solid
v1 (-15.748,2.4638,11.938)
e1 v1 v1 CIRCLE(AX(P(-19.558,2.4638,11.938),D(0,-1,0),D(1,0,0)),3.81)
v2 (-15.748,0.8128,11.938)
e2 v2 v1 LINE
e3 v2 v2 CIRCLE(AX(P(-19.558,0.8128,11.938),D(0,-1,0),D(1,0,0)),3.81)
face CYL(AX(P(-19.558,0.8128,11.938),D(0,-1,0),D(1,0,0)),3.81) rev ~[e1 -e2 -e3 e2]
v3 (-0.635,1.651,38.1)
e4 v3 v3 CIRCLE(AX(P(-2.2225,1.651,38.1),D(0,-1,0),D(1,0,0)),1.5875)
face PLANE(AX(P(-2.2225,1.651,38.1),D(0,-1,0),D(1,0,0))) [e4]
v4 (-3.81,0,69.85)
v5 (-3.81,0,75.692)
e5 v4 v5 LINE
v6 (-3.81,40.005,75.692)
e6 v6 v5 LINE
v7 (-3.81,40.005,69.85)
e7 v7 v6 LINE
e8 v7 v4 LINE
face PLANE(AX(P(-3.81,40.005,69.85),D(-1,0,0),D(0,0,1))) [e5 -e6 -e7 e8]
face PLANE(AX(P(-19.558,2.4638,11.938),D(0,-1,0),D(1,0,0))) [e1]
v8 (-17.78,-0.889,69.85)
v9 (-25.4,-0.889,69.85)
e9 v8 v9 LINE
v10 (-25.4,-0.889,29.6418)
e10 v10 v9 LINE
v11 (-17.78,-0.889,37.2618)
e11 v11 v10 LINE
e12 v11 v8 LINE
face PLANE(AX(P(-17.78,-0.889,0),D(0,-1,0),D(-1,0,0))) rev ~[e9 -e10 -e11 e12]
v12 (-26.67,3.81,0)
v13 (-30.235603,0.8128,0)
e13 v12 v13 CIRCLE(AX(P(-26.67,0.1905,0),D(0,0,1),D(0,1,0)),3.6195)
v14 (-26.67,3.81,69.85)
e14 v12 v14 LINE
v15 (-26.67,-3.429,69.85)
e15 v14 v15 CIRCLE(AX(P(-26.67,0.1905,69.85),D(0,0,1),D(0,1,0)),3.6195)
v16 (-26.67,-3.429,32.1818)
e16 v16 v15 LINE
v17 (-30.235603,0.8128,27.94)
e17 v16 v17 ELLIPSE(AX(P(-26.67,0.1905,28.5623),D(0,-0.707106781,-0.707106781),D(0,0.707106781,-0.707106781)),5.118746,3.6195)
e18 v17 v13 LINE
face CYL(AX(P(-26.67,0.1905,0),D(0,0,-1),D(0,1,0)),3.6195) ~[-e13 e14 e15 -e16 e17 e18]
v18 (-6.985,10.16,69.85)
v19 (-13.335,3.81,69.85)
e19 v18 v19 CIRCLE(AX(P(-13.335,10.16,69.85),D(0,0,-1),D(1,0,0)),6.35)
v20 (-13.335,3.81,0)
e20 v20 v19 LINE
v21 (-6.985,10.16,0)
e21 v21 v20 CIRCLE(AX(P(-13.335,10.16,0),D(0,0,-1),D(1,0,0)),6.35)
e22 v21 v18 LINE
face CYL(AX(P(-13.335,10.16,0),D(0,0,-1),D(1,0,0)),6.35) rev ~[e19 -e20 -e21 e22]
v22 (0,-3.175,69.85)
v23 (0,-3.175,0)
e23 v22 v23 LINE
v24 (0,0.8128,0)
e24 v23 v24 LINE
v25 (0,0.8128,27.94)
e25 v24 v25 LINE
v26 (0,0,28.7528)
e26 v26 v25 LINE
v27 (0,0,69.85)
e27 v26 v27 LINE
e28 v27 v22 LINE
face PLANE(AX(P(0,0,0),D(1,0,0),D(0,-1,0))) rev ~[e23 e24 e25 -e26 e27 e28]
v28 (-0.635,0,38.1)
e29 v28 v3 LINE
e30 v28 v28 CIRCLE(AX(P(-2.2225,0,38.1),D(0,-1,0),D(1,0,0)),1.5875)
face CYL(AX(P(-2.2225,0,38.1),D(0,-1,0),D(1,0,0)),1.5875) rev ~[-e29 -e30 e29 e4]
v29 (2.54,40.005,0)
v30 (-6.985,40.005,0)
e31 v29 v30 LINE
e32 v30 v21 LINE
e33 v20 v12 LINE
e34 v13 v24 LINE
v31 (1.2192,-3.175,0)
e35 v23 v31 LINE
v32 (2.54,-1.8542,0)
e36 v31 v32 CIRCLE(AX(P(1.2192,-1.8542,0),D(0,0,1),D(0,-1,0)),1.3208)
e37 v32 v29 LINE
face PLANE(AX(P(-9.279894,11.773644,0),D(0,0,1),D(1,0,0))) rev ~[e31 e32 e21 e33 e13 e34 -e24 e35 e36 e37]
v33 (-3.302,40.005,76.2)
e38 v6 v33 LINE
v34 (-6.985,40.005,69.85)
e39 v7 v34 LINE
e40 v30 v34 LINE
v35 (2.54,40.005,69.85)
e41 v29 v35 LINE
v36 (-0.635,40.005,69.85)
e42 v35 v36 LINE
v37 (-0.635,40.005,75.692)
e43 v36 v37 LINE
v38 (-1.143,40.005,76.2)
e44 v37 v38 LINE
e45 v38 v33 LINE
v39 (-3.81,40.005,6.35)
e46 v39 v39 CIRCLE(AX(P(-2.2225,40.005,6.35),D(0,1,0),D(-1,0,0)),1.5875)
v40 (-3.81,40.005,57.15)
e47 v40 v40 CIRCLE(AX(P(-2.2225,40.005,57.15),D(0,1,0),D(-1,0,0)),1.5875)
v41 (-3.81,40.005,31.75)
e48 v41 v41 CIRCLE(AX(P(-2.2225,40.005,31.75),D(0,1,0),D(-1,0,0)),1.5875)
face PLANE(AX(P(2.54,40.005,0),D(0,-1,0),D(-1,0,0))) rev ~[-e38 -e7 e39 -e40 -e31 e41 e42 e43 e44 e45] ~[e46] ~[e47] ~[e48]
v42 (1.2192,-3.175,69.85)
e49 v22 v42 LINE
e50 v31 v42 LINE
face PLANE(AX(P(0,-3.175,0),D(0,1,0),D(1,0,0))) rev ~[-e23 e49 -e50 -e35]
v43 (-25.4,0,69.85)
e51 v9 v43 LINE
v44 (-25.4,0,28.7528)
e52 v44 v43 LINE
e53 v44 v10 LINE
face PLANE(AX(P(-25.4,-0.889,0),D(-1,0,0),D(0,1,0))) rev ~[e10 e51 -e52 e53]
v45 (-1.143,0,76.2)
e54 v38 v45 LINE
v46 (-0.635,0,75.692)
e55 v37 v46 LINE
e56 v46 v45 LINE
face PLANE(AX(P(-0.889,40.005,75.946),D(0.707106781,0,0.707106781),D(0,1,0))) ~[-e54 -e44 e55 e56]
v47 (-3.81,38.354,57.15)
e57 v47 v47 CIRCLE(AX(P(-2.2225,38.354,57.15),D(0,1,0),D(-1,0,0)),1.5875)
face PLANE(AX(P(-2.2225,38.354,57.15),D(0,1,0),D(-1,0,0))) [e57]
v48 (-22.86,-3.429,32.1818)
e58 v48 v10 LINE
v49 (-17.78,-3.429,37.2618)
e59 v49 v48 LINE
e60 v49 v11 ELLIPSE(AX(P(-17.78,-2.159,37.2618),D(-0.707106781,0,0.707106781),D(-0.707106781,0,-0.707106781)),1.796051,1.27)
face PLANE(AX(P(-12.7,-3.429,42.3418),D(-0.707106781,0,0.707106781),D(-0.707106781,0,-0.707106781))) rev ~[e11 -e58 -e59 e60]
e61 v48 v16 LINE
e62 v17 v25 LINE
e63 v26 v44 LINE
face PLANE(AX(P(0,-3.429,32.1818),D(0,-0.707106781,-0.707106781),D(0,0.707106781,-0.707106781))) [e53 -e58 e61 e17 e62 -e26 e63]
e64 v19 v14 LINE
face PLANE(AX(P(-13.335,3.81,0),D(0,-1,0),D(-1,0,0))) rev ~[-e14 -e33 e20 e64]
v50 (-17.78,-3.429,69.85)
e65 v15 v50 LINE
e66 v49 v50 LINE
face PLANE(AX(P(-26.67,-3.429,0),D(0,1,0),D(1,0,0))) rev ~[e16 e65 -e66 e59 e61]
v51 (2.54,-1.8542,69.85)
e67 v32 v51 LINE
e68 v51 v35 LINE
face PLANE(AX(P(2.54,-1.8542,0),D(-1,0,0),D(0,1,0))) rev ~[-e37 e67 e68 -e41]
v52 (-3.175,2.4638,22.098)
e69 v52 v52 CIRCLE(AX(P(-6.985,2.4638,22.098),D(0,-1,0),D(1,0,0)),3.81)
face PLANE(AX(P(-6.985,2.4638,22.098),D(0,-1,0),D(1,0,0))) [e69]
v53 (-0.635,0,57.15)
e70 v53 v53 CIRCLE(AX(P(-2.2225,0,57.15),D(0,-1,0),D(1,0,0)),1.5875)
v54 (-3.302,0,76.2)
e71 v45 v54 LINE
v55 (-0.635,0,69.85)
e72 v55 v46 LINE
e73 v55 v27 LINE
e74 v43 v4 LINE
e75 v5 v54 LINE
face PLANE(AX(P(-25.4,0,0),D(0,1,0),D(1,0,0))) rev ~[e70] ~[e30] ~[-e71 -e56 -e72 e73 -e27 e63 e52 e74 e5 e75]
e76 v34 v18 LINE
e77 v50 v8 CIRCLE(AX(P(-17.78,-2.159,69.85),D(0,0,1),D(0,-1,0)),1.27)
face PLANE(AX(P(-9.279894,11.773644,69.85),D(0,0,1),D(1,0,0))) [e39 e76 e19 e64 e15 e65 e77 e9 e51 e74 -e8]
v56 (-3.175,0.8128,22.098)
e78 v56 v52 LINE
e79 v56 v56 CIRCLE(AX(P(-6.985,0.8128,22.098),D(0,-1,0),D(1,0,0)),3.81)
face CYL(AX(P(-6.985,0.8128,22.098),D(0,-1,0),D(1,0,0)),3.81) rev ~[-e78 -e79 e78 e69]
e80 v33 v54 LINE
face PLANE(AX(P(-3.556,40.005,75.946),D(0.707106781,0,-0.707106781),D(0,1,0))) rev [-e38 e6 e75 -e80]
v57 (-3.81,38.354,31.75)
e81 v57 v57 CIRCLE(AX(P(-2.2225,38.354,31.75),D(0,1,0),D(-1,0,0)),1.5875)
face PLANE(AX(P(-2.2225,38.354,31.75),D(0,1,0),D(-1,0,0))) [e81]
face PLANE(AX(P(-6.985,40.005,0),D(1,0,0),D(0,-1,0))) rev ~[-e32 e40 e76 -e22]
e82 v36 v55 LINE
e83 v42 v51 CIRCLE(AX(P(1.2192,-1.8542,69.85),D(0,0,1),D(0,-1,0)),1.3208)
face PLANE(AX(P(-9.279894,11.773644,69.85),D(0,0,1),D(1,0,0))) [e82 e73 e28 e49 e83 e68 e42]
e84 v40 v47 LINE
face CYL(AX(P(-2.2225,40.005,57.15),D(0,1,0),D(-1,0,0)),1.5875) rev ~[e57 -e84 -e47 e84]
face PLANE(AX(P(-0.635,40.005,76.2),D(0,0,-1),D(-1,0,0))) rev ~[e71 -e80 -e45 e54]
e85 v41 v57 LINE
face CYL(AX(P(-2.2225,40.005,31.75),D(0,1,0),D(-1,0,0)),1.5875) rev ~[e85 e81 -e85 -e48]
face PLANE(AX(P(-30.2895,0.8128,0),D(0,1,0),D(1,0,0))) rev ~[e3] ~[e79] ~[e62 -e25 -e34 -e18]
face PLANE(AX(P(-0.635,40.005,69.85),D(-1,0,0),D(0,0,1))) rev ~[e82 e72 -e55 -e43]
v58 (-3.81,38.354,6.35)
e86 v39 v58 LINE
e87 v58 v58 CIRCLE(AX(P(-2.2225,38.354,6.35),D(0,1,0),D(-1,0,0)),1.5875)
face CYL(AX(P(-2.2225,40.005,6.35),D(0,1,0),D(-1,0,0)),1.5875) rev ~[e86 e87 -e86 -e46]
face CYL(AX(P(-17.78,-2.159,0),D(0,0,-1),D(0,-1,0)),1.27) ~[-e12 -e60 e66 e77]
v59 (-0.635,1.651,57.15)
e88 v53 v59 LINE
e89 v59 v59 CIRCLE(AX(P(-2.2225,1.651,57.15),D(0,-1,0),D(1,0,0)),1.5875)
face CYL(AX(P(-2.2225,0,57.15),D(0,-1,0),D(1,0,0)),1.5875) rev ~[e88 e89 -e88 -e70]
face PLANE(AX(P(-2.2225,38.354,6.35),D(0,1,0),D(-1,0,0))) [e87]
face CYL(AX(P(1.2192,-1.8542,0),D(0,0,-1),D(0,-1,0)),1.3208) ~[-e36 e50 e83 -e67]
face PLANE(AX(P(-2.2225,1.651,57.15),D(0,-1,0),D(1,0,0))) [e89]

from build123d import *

# Parameters (mm, degrees)
F1_DEPTH  = 69.85
F2_W      = 3.175
F2_H      = 6.35
F3_DEPTH  = 40.005
F4_SIZE   = 0.508
F5_R      = 1.5875
F6_DEPTH  = 1.651
F7_R      = 1.5875
F8_DEPTH  = 1.651
F9_W      = 30.2895
F9_H      = 4.2418
F10_DEPTH = 27.94
F11_R     = 3.81
F12_DEPTH = 1.651
F14_DEPTH = 30.2905
F16_DEPTH = 2.54


with BuildPart() as f1:
    # F0 (on Top) → F1 (new body)
    with BuildSketch(Plane.XY):
        with BuildLine():
            Line((2.54, 40.005), (-6.985, 40.005))
            Line((-6.985, 40.005), (-6.985, 10.16))
            ThreePointArc((-6.985, 10.16), (-8.8448719395, 5.6698719395), (-13.335, 3.81))
            Line((-13.335, 3.81), (-26.67, 3.81))
            ThreePointArc((-26.67, 3.81), (-30.2895, 0.1905), (-26.67, -3.429))
            Line((-26.67, -3.429), (-17.78, -3.429))
            ThreePointArc((-17.78, -3.429), (-16.51, -2.159), (-17.78, -0.889))
            Line((-17.78, -0.889), (-25.4, -0.889))
            Line((-25.4, -0.889), (-25.4, 0))
            Line((-25.4, 0), (0, 0))
            Line((0, 0), (0, -3.175))
            Line((0, -3.175), (1.2192, -3.175))
            ThreePointArc((1.2192, -3.175), (2.1531466366, -2.7881466366), (2.54, -1.8542))
            Line((2.54, -1.8542), (2.54, 40.005))
        make_face()
    extrude(amount=F1_DEPTH)

    # F2 (on face) → F3 (join, through all)
    with BuildSketch(Plane(origin=(0, 40.005, 0), x_dir=(-1, 0, 0), z_dir=(0, 1, 0))):
        with Locations((2.2225, 73.025)):
            Rectangle(F2_W, F2_H)
    extrude(amount=-F3_DEPTH)

    # F4
    f4_edges = [f1.edges().sort_by_distance(p)[0] for p in [
        (-0.635, 20.0025, 76.2),
        (-3.81, 20.0025, 76.2),
    ]]
    chamfer(f4_edges, length=F4_SIZE)

    # F5 (on face) → F6 (cut)
    with BuildSketch(Plane(origin=(0, 40.005, 0), x_dir=(-1, 0, 0), z_dir=(0, 1, 0))):
        with Locations((2.2225, 6.35)):
            Circle(F5_R)
        with Locations((2.2225, 31.75)):
            Circle(F5_R)
        with Locations((2.2225, 57.15)):
            Circle(F5_R)
    extrude(amount=-F6_DEPTH, mode=Mode.SUBTRACT)

    # F7 (on face) → F8 (cut)
    with BuildSketch(Plane.XZ):
        with Locations((-2.2225, 57.15)):
            Circle(F7_R)
        with Locations((-2.2225, 38.1)):
            Circle(F7_R)
    extrude(amount=-F8_DEPTH, mode=Mode.SUBTRACT)

    # F9 (on face) → F10 (cut)
    with BuildSketch(Plane(origin=(0, 0, 0), x_dir=(1, 0, 0), z_dir=(0, 0, -1))):
        with Locations((-15.14475, 1.3081)):
            Rectangle(F9_W, F9_H)
    extrude(amount=-F10_DEPTH, mode=Mode.SUBTRACT)

    # F11 (on face) → F12 (cut)
    with BuildSketch(Plane.XZ.offset(-0.8128)):
        with Locations((-6.985, 22.098)):
            Circle(F11_R)
        with Locations((-19.558, 11.938)):
            Circle(F11_R)
    extrude(amount=-F12_DEPTH, mode=Mode.SUBTRACT)

    # F13 (on face) → F14 (cut, through all)
    with BuildSketch(Plane(origin=(0, 0, 0), x_dir=(0, -1, 0), z_dir=(-1, 0, 0))):
        Polygon((3.429, 32.1818), (-0.8128, 27.94), (3.429, 27.94), align=None)
    extrude(amount=F14_DEPTH, mode=Mode.SUBTRACT)

    # F15 (on face) → F16 (cut, through all)
    with BuildSketch(Plane.XZ.offset(3.429)):
        Polygon((-12.7, 42.3418), (-25.4, 29.6418), (-12.7, 29.6418), align=None)
    extrude(amount=-F16_DEPTH, mode=Mode.SUBTRACT)


solid = f1.part
